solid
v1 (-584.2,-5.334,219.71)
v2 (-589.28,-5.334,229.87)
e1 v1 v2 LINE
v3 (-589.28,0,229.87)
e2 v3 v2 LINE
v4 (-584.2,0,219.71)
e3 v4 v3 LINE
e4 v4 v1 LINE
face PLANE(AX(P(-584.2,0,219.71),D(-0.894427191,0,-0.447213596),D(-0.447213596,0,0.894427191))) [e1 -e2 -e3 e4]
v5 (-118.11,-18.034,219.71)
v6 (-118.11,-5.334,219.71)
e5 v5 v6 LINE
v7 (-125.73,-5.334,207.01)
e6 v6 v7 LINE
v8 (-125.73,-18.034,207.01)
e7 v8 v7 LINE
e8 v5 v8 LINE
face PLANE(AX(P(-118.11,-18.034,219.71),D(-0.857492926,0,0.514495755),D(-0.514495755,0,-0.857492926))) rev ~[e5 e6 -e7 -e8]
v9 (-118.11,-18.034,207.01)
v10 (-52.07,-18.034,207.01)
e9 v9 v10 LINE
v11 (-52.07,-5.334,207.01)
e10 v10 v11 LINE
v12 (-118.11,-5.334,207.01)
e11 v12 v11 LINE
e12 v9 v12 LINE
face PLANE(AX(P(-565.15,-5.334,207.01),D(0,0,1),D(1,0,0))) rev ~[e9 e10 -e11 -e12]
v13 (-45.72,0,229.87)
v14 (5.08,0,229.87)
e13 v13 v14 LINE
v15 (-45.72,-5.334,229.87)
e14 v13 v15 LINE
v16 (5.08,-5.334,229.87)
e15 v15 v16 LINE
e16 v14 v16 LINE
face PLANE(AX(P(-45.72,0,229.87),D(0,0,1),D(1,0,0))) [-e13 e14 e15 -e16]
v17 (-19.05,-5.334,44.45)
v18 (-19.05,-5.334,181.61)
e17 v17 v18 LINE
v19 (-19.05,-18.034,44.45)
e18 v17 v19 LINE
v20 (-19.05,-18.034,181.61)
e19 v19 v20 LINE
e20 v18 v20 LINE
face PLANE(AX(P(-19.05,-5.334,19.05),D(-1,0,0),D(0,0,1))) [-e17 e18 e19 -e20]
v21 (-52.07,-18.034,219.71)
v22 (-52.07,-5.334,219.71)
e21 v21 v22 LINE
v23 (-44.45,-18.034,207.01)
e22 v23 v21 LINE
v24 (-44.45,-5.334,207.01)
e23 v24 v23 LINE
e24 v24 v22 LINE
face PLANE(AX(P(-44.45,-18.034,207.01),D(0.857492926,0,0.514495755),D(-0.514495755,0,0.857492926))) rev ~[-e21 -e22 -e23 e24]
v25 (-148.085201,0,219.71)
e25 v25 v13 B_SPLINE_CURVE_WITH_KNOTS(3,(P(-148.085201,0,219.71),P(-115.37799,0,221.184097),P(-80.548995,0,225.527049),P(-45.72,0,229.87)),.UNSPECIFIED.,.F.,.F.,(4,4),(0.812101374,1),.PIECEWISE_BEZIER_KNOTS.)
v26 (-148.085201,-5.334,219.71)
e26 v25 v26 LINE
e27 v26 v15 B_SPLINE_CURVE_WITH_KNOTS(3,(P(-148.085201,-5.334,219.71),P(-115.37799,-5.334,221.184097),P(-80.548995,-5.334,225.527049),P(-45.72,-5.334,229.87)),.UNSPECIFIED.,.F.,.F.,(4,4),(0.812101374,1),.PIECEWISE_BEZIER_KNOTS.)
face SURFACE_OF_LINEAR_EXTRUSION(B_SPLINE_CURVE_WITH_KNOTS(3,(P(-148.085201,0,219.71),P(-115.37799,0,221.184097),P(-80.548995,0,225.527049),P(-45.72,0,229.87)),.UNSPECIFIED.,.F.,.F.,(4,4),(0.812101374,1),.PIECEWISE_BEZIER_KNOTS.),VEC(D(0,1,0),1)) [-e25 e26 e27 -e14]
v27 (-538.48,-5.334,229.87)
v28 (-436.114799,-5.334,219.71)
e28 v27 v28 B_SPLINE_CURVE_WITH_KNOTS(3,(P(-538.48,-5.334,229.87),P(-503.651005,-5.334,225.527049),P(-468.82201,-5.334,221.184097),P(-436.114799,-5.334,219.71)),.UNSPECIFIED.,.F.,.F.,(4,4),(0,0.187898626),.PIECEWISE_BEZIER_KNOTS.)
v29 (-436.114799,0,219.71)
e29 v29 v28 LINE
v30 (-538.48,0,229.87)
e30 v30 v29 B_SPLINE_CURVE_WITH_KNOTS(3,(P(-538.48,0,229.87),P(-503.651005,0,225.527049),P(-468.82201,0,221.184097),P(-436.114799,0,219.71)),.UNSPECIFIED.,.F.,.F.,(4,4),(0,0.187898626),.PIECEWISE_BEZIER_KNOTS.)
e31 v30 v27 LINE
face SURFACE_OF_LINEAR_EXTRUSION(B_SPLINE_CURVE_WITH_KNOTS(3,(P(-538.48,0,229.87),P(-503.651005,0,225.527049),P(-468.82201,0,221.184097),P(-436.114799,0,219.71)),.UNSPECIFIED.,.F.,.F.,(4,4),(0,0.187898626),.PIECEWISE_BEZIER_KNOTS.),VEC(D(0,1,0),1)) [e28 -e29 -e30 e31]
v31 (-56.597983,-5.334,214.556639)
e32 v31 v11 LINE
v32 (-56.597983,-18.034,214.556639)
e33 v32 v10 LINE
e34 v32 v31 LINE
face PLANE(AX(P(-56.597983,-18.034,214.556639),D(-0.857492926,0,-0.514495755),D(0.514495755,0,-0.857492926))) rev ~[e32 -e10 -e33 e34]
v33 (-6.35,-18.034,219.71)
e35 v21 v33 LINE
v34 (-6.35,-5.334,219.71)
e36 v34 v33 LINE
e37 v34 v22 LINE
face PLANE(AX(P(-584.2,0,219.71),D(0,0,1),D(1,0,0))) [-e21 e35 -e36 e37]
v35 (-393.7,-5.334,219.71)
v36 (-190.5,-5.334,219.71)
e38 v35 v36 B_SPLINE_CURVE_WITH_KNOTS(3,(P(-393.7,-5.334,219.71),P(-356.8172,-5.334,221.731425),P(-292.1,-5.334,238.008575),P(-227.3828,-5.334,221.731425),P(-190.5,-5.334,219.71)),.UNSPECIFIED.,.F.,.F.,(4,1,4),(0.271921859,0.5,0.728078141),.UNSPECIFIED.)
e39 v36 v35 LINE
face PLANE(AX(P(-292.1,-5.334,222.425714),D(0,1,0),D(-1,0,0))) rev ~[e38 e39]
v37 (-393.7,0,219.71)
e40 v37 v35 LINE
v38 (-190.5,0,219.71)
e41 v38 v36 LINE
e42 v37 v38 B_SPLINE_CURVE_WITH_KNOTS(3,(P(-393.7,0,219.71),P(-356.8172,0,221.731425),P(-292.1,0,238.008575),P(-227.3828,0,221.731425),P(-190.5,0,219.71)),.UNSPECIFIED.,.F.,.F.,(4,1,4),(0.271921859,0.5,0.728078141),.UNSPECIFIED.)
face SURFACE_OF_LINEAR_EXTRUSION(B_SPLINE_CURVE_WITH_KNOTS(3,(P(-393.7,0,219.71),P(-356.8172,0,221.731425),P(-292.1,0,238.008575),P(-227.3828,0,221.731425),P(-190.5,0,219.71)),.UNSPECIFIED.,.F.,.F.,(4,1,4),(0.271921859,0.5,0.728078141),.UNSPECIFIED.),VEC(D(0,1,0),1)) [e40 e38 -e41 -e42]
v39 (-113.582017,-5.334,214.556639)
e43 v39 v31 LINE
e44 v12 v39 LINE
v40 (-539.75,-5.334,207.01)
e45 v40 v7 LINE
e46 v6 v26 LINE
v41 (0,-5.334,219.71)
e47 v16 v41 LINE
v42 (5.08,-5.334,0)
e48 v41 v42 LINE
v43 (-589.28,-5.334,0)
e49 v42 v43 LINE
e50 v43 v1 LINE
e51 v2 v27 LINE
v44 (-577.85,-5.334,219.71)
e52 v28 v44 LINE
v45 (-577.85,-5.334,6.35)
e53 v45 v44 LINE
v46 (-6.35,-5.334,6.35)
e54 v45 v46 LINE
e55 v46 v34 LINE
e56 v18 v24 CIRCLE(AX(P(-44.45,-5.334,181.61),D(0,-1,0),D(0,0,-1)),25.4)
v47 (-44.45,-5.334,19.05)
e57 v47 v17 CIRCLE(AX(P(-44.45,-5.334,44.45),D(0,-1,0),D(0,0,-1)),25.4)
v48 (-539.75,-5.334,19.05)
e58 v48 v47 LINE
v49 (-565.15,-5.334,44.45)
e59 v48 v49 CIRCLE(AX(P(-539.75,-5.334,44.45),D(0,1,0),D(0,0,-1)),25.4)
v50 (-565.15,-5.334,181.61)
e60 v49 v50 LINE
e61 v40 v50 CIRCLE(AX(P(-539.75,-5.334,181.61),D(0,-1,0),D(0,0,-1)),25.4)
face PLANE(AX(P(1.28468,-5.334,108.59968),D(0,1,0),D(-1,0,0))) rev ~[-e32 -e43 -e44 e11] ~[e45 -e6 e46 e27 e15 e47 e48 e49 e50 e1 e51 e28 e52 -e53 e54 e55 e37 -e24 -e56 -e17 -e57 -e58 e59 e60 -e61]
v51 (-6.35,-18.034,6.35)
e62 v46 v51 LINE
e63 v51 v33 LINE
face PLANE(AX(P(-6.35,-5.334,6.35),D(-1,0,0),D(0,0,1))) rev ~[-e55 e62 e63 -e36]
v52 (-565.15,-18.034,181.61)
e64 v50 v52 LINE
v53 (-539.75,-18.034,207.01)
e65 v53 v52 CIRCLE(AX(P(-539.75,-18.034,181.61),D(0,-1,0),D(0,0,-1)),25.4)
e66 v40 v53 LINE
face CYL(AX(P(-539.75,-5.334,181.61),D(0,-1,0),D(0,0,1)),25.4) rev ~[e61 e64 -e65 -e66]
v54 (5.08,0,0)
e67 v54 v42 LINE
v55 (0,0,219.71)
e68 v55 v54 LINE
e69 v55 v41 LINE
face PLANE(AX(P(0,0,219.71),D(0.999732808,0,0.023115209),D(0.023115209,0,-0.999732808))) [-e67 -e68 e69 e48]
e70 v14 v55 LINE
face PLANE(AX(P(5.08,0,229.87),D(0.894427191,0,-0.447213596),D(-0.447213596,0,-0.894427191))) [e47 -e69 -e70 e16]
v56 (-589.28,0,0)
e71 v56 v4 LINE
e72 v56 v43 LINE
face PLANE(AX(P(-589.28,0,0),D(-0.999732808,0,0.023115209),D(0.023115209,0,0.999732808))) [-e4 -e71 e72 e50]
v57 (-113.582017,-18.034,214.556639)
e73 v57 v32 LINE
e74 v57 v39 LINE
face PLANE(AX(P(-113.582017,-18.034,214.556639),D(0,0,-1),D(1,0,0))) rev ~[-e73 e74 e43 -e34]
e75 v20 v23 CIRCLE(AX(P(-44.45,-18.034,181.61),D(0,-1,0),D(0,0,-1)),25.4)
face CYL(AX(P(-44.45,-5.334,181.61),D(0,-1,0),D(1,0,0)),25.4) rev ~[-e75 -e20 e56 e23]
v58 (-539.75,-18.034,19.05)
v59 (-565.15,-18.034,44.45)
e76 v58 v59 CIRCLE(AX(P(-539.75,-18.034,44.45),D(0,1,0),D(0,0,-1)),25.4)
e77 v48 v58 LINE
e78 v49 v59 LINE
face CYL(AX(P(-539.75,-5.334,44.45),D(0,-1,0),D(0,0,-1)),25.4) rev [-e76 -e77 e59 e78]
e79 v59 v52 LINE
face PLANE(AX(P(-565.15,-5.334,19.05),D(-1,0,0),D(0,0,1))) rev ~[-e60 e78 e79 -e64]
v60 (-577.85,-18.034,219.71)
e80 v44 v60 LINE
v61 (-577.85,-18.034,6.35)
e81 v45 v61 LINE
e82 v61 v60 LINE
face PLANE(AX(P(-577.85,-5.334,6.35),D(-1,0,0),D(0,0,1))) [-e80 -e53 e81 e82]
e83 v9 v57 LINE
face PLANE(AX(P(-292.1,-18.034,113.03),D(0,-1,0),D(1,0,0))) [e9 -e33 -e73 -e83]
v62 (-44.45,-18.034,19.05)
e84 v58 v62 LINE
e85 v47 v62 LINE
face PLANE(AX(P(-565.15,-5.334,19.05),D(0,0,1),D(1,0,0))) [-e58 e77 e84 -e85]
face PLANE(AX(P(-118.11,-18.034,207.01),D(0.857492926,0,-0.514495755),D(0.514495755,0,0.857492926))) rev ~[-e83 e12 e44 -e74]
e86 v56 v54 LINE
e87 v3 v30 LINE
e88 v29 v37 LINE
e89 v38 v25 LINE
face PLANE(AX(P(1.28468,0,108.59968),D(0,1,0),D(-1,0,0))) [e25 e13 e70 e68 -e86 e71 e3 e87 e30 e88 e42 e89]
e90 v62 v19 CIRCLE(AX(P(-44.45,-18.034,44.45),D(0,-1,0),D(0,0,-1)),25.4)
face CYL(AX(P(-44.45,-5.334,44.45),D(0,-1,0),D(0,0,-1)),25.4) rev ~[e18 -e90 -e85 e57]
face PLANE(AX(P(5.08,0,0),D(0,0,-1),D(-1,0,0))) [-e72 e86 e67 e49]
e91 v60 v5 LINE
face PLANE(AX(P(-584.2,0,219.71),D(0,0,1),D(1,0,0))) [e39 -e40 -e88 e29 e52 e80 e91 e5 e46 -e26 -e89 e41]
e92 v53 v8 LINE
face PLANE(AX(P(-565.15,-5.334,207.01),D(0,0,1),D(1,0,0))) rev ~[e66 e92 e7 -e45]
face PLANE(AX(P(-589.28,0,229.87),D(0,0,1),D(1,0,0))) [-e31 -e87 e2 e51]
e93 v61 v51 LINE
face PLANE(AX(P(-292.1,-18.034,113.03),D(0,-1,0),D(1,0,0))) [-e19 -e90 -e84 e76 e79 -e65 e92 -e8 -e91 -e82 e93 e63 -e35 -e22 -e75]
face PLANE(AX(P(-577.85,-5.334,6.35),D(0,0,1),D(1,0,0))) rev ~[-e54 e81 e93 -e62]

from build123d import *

# Parameters (mm, degrees)
F0_W     = 584.2
F0_H     = 219.71
F1_DEPTH = 5.334
F2_W     = 571.5
F2_H     = 213.36
F2_W_2   = 546.1
F2_H_2   = 187.96
F3_DEPTH = 12.7
F4_R     = 25.4
F6_DEPTH = 12.7
F8_DEPTH = 5.334


# Not quite as in the source:
# - a feature names something its author has since deleted; it is built from what else it names


with BuildPart() as f1:
    # F0 (on Front) → F1 (new body)
    with BuildSketch(Plane.XZ):
        with Locations((-292.1, 109.855)):
            Rectangle(F0_W, F0_H)
    extrude(amount=F1_DEPTH)

    # F2 (on face) → F3 (join)
    with BuildSketch(Plane.XZ.offset(5.334)):
        with Locations((-292.1, 113.03)):
            Rectangle(F2_W, F2_H)
        with Locations((-292.1, 113.03)):
            Rectangle(F2_W_2, F2_H_2, mode=Mode.SUBTRACT)
    extrude(amount=F3_DEPTH)

    # F4
    f4_edges = [f1.edges().sort_by_distance(p)[0] for p in [
        (-565.15, -11.684, 207.01),
        (-19.05, -11.684, 207.01),
        (-19.05, -11.684, 19.05),
        (-565.15, -11.684, 19.05),
    ]]
    fillet(f4_edges, radius=F4_R)

    # F5 (on face) → F6 (cut)
    with BuildSketch(Plane.XZ.offset(18.034)):
        Polygon((-118.11, 219.71), (-125.73, 207.01), (-118.11, 207.01), (-113.5820166854, 214.5566388576), (-110.49, 219.71), align=None)
        Polygon((-56.5979833146, 214.5566388576), (-52.07, 207.01), (-44.45, 207.01), (-52.07, 219.71), (-59.69, 219.71), align=None)
        Polygon((-59.69, 219.71), (-110.49, 219.71), (-113.5820166854, 214.5566388576), (-56.5979833146, 214.5566388576), align=None)
    extrude(amount=-F6_DEPTH, mode=Mode.SUBTRACT)

    # F7 (on face) → F8 (join)
    with BuildSketch(Plane(origin=(0, 0, 0), x_dir=(-1, 0, 0), z_dir=(0, 1, 0))):
        Polygon((-5.08, 0), (0, 0), (0, 219.71), align=None)
        Polygon((584.2, 219.71), (584.2, 0), (589.28, 0), align=None)
        with BuildLine():
            Line((-5.08, 229.87), (0, 219.71))
            Line((0, 219.71), (148.0852009026, 219.71))
            add(Edge.make_bspline(
                [(148.0852009026, 219.71), (115.3779899576, 221.1840971885), (80.5489949788, 225.5270485943), (45.72, 229.87)],
                knots=[0.812101374, 0.812101374, 0.812101374, 0.812101374, 1, 1, 1, 1], degree=3))
            Line((45.72, 229.87), (-5.08, 229.87))
        make_face()
        with BuildLine():
            Line((436.1147990974, 219.71), (584.2, 219.71))
            Line((584.2, 219.71), (589.28, 229.87))
            Line((589.28, 229.87), (538.48, 229.87))
            add(Edge.make_bspline(
                [(538.48, 229.87), (503.6510050212, 225.5270485943), (468.8220100424, 221.1840971885), (436.1147990974, 219.71)],
                knots=[0, 0, 0, 0, 0.187898626, 0.187898626, 0.187898626, 0.187898626], degree=3))
        make_face()
        with BuildLine():
            add(Edge.make_bspline(
                [(292.1, 229.87), (259.7414000619, 229.87), (227.3828001238, 221.731425099), (190.5, 219.71)],
                knots=[0.5, 0.5, 0.5, 0.5, 0.7280781407, 0.7280781407, 0.7280781407, 0.7280781407], degree=3))
            Line((190.5, 219.71), (393.7, 219.71))
            add(Edge.make_bspline(
                [(393.7, 219.71), (356.8171998762, 221.731425099), (324.4585999381, 229.87), (292.1, 229.87)],
                knots=[0.2719218593, 0.2719218593, 0.2719218593, 0.2719218593, 0.5, 0.5, 0.5, 0.5], degree=3))
        make_face()
    extrude(amount=-F8_DEPTH)


solid = f1.part
